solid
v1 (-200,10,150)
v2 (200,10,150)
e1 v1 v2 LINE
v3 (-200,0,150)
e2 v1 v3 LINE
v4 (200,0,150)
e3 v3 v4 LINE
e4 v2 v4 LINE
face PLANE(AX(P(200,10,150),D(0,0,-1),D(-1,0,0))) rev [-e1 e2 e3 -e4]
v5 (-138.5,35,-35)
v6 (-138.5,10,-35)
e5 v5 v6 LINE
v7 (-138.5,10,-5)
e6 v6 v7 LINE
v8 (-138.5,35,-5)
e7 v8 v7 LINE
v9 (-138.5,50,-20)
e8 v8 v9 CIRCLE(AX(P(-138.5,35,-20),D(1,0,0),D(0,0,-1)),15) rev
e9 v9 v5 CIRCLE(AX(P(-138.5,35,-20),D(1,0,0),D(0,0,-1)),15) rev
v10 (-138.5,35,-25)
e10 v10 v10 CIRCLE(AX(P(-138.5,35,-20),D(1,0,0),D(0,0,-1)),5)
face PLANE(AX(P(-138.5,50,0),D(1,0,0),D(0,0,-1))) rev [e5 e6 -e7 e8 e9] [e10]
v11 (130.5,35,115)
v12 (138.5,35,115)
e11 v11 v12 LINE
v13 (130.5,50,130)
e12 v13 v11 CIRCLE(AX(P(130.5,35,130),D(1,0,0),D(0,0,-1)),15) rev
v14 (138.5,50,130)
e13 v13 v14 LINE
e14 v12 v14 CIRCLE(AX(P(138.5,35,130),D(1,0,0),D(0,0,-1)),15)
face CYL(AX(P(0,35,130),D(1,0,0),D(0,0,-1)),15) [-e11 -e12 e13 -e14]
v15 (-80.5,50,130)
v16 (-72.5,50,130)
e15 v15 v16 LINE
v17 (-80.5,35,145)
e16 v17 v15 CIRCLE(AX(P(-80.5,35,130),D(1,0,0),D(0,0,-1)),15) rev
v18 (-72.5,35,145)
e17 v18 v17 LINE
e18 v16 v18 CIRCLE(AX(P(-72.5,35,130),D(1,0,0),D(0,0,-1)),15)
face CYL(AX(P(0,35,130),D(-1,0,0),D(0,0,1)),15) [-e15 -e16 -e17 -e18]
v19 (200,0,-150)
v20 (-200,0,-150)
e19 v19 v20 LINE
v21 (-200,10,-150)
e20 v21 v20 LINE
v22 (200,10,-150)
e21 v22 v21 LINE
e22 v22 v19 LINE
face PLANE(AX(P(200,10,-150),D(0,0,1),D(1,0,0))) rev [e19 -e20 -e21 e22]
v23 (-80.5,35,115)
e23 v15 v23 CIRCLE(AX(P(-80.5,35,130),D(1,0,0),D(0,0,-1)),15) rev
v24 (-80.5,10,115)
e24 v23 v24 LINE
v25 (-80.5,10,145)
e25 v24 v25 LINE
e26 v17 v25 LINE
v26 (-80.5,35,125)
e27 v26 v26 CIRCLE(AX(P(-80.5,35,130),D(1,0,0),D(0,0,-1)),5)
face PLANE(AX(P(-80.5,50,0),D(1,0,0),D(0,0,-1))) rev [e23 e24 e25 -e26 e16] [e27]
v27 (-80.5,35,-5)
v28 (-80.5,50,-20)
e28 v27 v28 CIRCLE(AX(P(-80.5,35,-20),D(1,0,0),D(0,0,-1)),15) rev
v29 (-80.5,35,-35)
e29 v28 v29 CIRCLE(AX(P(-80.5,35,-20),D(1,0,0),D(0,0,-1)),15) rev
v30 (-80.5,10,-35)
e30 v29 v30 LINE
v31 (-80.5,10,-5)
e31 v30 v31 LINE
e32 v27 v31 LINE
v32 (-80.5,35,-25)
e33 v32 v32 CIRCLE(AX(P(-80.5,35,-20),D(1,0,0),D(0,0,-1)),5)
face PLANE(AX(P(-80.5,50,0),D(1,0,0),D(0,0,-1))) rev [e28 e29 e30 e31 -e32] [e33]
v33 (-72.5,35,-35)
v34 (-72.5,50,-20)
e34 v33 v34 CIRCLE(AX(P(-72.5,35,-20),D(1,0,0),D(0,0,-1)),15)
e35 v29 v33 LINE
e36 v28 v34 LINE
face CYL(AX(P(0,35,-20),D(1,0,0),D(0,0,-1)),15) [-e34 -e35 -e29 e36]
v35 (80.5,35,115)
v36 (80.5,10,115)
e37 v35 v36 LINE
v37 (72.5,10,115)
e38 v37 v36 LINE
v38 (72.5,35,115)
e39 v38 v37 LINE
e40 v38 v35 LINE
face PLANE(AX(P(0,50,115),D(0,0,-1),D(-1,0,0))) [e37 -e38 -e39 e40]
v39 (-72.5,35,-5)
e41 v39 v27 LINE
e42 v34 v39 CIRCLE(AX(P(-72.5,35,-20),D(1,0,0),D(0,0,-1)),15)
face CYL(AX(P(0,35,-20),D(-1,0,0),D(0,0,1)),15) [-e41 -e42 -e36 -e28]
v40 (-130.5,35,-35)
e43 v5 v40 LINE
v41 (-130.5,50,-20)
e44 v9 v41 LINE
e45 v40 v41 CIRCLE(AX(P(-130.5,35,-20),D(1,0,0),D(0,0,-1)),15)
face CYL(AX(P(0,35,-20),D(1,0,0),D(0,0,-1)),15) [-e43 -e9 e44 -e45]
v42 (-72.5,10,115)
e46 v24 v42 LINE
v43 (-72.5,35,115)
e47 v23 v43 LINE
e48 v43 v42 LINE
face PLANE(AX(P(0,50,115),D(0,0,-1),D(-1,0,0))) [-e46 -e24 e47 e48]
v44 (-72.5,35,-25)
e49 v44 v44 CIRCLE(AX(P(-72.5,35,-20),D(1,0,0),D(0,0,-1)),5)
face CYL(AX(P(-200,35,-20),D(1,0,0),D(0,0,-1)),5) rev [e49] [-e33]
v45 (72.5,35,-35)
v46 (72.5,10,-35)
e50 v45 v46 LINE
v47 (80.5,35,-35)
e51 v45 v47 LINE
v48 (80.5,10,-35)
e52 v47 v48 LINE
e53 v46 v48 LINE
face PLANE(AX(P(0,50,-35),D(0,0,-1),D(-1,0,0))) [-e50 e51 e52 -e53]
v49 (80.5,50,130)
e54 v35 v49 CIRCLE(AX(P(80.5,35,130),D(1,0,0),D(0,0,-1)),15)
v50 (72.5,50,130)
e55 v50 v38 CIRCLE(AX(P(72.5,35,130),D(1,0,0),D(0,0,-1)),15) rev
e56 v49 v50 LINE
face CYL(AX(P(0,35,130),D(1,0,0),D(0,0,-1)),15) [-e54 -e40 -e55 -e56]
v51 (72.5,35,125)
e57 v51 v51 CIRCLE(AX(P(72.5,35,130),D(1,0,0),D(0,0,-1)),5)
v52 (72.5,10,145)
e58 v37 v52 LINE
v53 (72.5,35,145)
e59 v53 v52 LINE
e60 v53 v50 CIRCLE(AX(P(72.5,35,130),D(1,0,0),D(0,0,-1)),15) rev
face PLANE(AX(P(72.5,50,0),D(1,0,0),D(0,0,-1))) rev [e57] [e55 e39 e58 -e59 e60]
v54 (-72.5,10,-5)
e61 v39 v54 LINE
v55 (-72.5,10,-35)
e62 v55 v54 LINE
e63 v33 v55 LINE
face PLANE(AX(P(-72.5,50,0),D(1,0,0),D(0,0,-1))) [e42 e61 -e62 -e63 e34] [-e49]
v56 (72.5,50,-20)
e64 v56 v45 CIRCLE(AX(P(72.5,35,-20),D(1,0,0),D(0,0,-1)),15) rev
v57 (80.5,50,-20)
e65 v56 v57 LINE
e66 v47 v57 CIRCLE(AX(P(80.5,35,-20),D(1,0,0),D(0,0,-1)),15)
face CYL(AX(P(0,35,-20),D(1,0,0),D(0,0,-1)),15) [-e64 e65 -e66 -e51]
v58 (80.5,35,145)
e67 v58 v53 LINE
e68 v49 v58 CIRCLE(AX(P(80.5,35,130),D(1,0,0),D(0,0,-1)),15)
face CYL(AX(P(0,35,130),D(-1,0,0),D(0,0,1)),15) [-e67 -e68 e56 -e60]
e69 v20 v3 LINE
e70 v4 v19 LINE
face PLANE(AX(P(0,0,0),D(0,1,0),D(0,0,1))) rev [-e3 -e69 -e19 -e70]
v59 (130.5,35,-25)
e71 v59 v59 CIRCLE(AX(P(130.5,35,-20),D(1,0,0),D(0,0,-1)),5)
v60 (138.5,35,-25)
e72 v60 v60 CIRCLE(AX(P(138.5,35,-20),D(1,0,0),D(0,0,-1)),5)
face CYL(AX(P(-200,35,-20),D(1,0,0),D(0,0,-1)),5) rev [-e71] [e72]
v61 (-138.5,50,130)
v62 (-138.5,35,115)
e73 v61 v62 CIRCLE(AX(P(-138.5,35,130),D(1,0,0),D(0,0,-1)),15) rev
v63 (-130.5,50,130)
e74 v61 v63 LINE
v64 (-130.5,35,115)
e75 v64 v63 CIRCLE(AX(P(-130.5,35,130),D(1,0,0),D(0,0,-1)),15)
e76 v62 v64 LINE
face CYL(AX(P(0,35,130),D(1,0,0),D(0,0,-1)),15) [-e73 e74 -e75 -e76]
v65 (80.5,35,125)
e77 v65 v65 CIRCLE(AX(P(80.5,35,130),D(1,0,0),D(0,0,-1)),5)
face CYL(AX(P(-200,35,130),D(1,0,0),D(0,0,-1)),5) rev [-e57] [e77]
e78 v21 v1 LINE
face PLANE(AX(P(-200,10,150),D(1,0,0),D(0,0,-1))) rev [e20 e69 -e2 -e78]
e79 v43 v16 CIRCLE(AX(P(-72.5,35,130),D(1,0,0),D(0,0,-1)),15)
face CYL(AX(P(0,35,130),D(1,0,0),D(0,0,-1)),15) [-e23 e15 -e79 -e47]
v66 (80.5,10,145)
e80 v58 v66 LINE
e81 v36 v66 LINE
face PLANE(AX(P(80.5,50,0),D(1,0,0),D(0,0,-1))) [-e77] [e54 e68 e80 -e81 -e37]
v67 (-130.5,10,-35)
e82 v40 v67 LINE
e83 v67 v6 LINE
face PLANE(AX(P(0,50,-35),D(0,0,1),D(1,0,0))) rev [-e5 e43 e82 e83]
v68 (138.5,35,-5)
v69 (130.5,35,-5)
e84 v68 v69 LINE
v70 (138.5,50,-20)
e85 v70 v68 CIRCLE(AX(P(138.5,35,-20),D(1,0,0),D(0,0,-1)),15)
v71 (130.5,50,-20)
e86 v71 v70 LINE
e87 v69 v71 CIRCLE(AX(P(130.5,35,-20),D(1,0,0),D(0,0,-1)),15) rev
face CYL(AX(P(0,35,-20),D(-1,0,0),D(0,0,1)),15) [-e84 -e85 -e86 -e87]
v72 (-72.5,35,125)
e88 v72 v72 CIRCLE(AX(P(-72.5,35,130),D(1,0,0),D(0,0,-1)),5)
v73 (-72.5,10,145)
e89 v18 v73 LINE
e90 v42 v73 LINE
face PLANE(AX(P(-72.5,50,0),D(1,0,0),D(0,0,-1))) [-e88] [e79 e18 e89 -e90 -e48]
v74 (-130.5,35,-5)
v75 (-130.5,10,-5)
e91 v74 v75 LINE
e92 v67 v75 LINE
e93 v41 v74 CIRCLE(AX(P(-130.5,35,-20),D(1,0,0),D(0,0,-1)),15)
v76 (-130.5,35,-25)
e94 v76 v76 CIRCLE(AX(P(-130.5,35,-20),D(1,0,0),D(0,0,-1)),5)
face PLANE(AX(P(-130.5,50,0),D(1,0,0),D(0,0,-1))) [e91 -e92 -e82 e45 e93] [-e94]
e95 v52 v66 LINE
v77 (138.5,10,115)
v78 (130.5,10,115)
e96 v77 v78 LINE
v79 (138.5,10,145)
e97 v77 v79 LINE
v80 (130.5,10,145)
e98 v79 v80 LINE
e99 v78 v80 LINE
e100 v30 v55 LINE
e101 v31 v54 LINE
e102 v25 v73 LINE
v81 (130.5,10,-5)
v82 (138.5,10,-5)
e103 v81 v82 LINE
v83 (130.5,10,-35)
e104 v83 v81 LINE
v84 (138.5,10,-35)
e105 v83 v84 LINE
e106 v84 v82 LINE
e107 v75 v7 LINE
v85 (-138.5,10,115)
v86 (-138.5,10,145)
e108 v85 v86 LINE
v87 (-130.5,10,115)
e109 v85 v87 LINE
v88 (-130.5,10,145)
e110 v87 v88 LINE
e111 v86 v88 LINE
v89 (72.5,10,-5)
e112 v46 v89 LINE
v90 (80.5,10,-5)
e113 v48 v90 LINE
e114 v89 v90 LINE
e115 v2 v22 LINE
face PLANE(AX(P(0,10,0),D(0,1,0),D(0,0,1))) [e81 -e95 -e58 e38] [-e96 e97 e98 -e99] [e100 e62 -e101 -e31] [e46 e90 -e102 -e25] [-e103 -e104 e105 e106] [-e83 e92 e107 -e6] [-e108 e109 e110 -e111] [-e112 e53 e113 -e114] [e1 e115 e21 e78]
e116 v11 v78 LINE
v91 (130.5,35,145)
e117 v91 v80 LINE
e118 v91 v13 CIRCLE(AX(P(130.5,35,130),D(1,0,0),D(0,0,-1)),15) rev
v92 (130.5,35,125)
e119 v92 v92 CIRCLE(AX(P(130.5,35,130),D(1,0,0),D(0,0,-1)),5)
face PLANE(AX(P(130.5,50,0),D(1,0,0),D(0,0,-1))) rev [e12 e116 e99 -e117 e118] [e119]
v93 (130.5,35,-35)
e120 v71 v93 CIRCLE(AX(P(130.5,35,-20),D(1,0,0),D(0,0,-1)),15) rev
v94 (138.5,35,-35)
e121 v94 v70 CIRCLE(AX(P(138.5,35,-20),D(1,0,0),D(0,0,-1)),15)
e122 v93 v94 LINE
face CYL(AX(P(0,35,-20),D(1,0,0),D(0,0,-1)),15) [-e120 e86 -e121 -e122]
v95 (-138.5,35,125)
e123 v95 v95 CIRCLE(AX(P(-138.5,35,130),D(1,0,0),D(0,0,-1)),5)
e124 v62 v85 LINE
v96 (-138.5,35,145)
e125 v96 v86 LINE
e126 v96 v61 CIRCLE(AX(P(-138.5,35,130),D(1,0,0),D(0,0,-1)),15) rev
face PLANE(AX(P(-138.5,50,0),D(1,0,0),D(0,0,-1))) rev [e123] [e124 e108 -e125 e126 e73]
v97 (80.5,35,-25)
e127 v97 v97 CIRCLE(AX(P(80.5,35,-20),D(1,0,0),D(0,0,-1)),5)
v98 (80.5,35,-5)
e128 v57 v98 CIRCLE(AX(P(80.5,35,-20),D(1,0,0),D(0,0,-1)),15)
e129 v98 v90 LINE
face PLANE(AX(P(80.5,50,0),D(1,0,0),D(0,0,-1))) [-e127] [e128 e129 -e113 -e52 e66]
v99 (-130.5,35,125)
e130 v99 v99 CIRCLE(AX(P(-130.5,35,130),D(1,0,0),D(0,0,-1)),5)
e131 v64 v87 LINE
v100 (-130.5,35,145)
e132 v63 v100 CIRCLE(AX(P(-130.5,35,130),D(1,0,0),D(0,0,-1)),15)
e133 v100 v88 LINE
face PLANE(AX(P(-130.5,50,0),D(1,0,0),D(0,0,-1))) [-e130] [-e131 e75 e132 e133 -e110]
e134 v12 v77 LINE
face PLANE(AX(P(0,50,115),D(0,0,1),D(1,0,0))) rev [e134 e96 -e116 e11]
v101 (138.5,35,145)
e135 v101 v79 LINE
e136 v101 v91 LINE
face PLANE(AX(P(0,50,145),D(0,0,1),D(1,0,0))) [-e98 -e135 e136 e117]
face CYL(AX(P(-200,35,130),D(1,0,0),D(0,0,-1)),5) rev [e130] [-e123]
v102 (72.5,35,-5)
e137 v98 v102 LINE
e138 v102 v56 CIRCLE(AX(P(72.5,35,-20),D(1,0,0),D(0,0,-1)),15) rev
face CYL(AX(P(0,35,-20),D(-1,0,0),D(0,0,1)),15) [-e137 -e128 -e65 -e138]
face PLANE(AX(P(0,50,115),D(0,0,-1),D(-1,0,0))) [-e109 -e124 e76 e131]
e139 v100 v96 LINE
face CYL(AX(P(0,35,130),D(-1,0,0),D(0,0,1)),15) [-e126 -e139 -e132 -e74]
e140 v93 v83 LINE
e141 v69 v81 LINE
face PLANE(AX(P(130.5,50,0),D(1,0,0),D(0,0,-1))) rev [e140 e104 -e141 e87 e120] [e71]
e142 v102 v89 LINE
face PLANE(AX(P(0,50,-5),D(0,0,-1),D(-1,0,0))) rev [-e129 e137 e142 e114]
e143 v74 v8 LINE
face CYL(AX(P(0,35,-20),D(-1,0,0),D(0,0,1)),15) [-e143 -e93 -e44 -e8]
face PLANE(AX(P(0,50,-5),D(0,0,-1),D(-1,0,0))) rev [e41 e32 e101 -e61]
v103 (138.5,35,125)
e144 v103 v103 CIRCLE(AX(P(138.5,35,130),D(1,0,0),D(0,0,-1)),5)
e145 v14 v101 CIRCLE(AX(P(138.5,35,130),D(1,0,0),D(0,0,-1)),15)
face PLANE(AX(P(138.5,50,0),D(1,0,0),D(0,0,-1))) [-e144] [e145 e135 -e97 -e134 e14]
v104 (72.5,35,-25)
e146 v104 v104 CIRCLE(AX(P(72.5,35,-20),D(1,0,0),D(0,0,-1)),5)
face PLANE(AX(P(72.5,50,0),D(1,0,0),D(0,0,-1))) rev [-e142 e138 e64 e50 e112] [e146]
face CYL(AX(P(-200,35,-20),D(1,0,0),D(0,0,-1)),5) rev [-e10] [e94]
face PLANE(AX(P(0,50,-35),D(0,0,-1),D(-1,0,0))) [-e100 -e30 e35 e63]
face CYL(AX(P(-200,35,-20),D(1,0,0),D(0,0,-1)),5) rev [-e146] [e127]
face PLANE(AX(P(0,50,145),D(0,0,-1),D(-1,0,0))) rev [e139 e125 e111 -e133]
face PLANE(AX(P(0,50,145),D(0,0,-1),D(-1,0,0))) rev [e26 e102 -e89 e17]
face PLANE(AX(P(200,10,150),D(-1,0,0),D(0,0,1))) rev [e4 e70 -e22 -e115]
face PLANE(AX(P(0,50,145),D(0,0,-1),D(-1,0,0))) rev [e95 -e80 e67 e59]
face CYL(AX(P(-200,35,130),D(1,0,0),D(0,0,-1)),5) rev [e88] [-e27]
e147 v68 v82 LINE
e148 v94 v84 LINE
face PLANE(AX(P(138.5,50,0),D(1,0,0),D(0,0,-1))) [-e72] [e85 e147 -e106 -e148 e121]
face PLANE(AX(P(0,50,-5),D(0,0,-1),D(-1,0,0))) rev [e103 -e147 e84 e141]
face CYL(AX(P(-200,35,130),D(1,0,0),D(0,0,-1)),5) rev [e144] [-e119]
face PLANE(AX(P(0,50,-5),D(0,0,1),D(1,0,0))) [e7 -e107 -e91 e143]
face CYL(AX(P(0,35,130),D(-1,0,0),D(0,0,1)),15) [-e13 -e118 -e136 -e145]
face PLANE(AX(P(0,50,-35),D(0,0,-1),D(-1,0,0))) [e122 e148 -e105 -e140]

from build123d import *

# Parameters (mm, degrees)
SKETCH1_W           = 400
SKETCH1_H           = 300
BOSS_EXTRUDE1_DEPTH = 10
SKETCH2_W           = 8
SKETCH2_H           = 30
BOSS_EXTRUDE2_DEPTH = 40
SKETCH3_R           = 5
CUT_EXTRUDE1_DEPTH  = 374.607079697
FILLET1_R           = 15
SKETCH4_W           = 8
SKETCH4_H           = 30
BOSS_EXTRUDE3_DEPTH = 40
SKETCH5_R           = 5
CUT_EXTRUDE2_DEPTH  = 374.607079697
FILLET2_R           = 15


with BuildPart() as part:
    # Sketch1 → Boss-Extrude1 (new body)
    with BuildSketch(Plane(origin=(0, 0, 0), x_dir=(1, 0, 0), z_dir=(0, 1, 0))):
        Rectangle(SKETCH1_W, SKETCH1_H)
    extrude(amount=BOSS_EXTRUDE1_DEPTH)

    # Sketch2 → Boss-Extrude2 (add)
    with BuildSketch(Plane(origin=(0, 10, 0), x_dir=(1, 0, 0), z_dir=(0, 1, 0))):
        with Locations((-134.5, -130)):
            Rectangle(SKETCH2_W, SKETCH2_H)
        with Locations((-76.5, -130)):
            Rectangle(SKETCH2_W, SKETCH2_H)
        with Locations((76.5, -130)):
            Rectangle(SKETCH2_W, SKETCH2_H)
        with Locations((134.5, -130)):
            Rectangle(SKETCH2_W, SKETCH2_H)
    extrude(amount=BOSS_EXTRUDE2_DEPTH)

    # Sketch3 → Cut-Extrude1 (cut, through all)
    with BuildSketch(Plane(origin=(138.5, 0, 0), x_dir=(0, 0, -1), z_dir=(1, 0, 0))):
        with Locations((-130, 35)):
            Circle(SKETCH3_R)
    extrude(amount=-CUT_EXTRUDE1_DEPTH, mode=Mode.SUBTRACT)

    # Fillet1
    fillet1_edges = [part.edges().sort_by_distance(p)[0] for p in [
        (134.5, 50, 115),
        (134.5, 50, 145),
        (76.5, 50, 145),
        (76.5, 50, 115),
        (-76.5, 50, 115),
        (-134.5, 50, 115),
        (-76.5, 50, 145),
        (-134.5, 50, 145),
    ]]
    fillet(fillet1_edges, radius=FILLET1_R - 0.0001)  # a hair under: the kernel refuses the full size

    # Sketch4 → Boss-Extrude3 (add)
    with BuildSketch(Plane(origin=(0, 10, 0), x_dir=(1, 0, 0), z_dir=(0, 1, 0))):
        with Locations((-134.5, 20)):
            Rectangle(SKETCH4_W, SKETCH4_H)
        with Locations((-76.5, 20)):
            Rectangle(SKETCH4_W, SKETCH4_H)
        with Locations((134.5, 20)):
            Rectangle(SKETCH4_W, SKETCH4_H)
        with Locations((76.5, 20)):
            Rectangle(SKETCH4_W, SKETCH4_H)
    extrude(amount=BOSS_EXTRUDE3_DEPTH)

    # Sketch5 → Cut-Extrude2 (cut, through all)
    with BuildSketch(Plane(origin=(138.5, 0, 0), x_dir=(0, 0, -1), z_dir=(1, 0, 0))):
        with Locations((20, 35)):
            Circle(SKETCH5_R)
    extrude(amount=-CUT_EXTRUDE2_DEPTH, mode=Mode.SUBTRACT)

    # Fillet2
    fillet2_edges = [part.edges().sort_by_distance(p)[0] for p in [
        (-134.5, 50, -35),
        (-76.5, 50, -35),
        (134.5, 50, -35),
        (76.5, 50, -35),
        (-134.5, 50, -5),
        (-76.5, 50, -5),
        (76.5, 50, -5),
        (134.5, 50, -5),
    ]]
    fillet(fillet2_edges, radius=FILLET2_R - 0.0001)  # a hair under: the kernel refuses the full size


solid = part.part
